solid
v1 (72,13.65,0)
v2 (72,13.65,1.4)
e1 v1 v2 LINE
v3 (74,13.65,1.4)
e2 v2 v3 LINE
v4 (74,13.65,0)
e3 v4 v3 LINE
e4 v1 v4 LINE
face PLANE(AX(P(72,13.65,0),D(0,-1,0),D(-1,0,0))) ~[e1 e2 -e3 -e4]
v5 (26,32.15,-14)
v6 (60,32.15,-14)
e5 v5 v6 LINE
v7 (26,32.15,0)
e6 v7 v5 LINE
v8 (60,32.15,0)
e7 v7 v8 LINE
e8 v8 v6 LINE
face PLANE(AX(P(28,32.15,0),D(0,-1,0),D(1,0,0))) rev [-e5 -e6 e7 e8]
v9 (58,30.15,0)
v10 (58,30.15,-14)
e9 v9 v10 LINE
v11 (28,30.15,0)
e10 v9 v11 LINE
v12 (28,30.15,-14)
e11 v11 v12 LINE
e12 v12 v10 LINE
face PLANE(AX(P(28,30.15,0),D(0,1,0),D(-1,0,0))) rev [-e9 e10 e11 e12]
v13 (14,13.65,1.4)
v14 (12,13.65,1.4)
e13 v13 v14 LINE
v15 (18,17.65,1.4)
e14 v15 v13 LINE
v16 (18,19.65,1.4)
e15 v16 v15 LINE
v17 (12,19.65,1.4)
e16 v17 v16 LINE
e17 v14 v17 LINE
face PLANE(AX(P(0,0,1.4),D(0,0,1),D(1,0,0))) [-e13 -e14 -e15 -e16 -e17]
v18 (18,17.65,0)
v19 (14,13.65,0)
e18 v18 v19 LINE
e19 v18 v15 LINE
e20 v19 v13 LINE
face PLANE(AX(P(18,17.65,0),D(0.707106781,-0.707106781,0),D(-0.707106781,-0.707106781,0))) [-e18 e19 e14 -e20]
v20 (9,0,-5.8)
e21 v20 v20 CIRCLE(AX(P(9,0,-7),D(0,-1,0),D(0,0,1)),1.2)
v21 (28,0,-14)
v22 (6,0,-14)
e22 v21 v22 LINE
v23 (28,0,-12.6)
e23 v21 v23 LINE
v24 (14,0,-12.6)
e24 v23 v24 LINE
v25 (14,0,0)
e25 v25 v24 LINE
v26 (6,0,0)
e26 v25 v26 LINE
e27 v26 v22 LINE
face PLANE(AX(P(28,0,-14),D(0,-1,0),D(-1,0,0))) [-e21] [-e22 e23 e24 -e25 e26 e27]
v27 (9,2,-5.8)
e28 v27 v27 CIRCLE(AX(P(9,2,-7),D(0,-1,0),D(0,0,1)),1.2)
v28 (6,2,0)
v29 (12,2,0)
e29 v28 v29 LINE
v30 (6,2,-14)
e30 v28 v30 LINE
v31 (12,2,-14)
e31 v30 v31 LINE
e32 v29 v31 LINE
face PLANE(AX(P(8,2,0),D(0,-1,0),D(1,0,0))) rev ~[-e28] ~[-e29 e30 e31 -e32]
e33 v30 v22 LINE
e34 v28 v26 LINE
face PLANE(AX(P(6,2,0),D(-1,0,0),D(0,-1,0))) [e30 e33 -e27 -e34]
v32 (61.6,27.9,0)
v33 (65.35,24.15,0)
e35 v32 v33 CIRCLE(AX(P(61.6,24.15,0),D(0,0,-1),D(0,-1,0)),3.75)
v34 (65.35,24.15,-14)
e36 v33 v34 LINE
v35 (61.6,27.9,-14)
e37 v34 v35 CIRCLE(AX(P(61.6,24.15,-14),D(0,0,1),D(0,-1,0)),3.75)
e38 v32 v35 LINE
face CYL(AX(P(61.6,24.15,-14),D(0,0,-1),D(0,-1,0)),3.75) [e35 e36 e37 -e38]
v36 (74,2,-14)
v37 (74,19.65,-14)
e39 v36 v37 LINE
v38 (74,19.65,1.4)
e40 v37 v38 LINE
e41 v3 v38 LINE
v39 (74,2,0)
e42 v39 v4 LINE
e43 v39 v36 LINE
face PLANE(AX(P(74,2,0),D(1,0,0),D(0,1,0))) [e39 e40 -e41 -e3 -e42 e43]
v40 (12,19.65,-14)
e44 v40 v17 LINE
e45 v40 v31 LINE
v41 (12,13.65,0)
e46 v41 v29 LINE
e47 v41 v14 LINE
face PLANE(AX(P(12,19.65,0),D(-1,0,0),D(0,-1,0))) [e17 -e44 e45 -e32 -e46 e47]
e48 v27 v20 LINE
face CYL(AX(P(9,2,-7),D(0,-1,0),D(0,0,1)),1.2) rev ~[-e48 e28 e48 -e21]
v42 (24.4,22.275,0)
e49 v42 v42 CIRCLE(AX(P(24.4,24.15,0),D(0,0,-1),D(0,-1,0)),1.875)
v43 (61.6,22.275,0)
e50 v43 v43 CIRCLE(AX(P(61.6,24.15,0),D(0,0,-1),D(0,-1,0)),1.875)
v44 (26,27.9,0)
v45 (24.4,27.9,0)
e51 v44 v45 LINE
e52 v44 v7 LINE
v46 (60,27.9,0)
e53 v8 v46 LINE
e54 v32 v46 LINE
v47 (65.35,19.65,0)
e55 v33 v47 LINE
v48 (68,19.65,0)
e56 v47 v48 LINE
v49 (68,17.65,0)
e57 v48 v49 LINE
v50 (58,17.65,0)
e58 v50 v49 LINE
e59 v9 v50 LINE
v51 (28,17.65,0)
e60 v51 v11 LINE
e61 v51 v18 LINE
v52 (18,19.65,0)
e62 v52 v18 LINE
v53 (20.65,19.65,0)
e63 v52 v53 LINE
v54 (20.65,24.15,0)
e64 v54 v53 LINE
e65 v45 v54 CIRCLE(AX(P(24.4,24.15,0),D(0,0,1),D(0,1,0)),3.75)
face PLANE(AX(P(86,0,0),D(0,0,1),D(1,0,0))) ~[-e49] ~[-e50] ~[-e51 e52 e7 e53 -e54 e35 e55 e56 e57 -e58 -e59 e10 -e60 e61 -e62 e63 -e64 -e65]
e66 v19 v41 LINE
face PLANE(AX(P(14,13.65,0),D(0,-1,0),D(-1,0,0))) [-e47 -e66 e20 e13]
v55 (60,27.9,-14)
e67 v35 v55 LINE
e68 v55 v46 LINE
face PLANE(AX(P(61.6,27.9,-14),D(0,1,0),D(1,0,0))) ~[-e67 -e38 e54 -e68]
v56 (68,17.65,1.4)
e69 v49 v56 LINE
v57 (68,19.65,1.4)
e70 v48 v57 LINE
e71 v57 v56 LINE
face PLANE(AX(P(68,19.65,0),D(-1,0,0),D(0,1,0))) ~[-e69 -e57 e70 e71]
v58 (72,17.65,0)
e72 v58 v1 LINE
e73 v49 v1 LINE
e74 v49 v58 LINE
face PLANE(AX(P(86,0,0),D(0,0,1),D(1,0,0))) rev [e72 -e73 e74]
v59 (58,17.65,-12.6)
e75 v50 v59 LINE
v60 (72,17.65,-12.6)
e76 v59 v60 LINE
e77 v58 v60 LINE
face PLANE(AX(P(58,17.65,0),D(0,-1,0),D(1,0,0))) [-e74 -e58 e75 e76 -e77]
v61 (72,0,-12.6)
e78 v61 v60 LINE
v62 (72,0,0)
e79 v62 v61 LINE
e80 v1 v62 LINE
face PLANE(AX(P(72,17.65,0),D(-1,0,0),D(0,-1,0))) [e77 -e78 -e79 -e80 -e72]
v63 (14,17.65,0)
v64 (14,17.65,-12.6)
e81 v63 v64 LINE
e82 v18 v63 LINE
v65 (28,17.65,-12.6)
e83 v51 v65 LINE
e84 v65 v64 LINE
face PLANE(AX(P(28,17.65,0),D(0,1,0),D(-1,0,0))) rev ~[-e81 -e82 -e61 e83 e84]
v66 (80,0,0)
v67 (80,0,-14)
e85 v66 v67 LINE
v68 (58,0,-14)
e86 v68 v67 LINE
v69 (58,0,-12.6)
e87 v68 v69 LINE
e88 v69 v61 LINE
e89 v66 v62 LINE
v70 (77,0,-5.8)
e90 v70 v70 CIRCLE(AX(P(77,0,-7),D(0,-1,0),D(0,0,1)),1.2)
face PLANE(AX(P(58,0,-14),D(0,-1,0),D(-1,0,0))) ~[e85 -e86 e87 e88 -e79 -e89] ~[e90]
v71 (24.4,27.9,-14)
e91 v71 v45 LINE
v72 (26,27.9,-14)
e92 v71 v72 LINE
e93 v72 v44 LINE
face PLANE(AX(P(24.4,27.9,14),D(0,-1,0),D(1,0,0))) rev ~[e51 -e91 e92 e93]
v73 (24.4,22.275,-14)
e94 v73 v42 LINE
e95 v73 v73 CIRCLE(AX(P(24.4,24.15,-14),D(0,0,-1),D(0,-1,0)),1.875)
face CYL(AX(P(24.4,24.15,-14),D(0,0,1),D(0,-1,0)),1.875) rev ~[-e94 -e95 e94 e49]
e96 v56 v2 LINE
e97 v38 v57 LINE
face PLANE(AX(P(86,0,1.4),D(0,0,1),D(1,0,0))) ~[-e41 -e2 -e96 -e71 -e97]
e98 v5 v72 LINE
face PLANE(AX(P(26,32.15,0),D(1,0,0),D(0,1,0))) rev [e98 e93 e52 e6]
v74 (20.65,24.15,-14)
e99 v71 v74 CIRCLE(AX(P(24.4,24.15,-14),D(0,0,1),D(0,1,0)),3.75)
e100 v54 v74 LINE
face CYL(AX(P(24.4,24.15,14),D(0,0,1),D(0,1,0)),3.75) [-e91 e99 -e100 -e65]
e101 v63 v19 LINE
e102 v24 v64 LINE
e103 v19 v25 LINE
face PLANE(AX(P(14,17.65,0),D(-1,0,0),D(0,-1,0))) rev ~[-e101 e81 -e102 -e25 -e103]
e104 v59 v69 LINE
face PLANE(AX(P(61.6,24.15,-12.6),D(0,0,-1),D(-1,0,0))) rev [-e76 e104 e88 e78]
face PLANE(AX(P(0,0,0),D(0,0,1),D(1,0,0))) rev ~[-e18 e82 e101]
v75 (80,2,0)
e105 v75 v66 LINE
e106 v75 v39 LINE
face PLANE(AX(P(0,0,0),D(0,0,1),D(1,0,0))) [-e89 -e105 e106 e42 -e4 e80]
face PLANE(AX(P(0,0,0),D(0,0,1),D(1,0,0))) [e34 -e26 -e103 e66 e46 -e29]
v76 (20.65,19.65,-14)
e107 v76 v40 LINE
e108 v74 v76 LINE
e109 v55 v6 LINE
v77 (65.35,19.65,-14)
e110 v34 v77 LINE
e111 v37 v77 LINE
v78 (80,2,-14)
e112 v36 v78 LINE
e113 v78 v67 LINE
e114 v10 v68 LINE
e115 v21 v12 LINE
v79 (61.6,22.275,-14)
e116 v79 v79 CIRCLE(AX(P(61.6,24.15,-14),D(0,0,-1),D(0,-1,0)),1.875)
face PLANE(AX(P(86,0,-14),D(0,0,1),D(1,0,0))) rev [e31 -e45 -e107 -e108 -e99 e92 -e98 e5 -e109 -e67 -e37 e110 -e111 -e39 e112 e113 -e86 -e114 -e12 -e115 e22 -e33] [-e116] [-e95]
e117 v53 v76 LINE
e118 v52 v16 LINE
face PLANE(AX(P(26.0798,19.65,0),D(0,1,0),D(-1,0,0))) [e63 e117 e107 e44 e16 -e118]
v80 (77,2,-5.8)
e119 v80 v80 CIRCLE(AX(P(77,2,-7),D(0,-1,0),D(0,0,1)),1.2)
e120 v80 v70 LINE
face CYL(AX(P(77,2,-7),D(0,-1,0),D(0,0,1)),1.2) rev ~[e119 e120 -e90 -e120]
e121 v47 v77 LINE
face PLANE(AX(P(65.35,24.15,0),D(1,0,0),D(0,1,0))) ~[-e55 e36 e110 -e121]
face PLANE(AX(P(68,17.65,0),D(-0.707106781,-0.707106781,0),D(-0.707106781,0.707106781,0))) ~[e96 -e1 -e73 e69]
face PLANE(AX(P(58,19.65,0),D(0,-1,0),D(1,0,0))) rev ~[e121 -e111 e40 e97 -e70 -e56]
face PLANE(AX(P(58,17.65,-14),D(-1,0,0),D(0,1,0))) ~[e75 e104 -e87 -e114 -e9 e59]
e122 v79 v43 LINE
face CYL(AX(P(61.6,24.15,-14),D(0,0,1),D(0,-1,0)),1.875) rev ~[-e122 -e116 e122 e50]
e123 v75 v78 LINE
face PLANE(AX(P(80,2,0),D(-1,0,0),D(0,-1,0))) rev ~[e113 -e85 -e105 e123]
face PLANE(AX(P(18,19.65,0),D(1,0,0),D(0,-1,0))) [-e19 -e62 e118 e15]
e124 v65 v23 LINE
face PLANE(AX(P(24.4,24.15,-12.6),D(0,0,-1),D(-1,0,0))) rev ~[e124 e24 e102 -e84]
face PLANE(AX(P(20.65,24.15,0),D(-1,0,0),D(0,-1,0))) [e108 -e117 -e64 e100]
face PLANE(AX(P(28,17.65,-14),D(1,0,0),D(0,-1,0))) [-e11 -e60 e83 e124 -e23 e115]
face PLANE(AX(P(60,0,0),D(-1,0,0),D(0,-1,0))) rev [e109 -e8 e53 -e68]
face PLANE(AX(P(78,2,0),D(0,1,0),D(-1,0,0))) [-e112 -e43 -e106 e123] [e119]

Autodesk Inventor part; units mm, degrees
ref_plane "YZ Plane" through (0, 0, 0) normal (1, 0, 0) x (0, 1, 0)
ref_plane "XZ Plane" through (0, 0, 0) normal (0, 1, 0) x (-1, 0, 0)
ref_plane "XY Plane" through (0, 0, 0) normal (0, 0, 1) x (1, 0, 0)
sketch "スケッチ1" plane through (0, 0, 0) normal (0, 0, 1) x (1, 0, 0)
  line L0 (0, 0) -> (0, 17.65)
  line L1 (0, 17.65) -> (28, 17.65)
  line L2 (28, 17.65) -> (28, 30.15)
  line L3 (28, 30.15) -> (58, 30.15)
  line L4 (58, 30.15) -> (58, 0)
  line L5 (58, 0) -> (60, 0)
  line L6 (60, 0) -> (60, 32.15)
  line L7 (60, 32.15) -> (28, 32.15)
  line L8 (28, 32.15) -> (26, 32.15)
  line L9 (26, 32.15) -> (26, 19.65)
  line L10 (26, 19.65) -> (-2, 19.65)
  line L11 (-2, 19.65) -> (-2, 0)
  line L12 (-2, 0) -> (0, 0)
  dimension "d0" = 17.65
  dimension "d1" = 28
  dimension "d2" = 12.5
  dimension "d3" = 30
  dimension "d4" = 2
  dimension "d5" = 32.15
  dimension "d6" = 32
  dimension "d7" = 2
  dimension "d8" = 12.5
  dimension "d9" = 28
extrude "押し出し1" add sketch "スケッチ1" along normal blind 14
sketch "スケッチ2" plane through (60, 0, 0) normal (1, 0, 0) x (0, 0, -1)
  line L0 (0, 0) -> (-14, 0) projected
  line L1 (-14, 0) -> (0, 0)
  line L2 (0, 0) -> (0, 2)
  line L3 (0, 2) -> (-14, 2)
  line L4 (-14, 2) -> (-14, 0)
  dimension "d12" = 14
  dimension "d13" = 2
extrude "押し出し2" add sketch "スケッチ2" along normal blind 7
sketch "スケッチ3" plane through (-2, 0, 0) normal (-1, 0, 0) x (0, 0, 1)
  line L0 (14, 2) -> (0, 2) projected
  line L1 (0, 0) -> (14, 0)
  line L2 (14, 0) -> (14, 2)
  line L3 (14, 2) -> (0, 2)
  line L4 (0, 2) -> (0, 0)
  dimension "d16" = 14
extrude "押し出し3" add sketch "スケッチ3" along normal blind 7
sketch "スケッチ4" plane through (0, 0, 14) normal (0, 0, 1) x (1, 0, 0)
  line L0 (60, 32.15) -> (60, 24.15)
  line L1 (60, 24.15) -> (61.6, 24.15)
  arc A0 (61.6, 20.4) -> (61.6, 27.9) centre (61.6, 24.15) ccw
  line L2 (61.6, 24.15) -> (61.6, 20.4) construction
  line L3 (61.6, 24.15) -> (61.6, 27.9) construction
  line L4 (61.6, 27.9) -> (60, 27.9)
  line L5 (61.6, 20.4) -> (60, 20.4)
  line L6 (60, 2) -> (60, 32.15) projected
  line L7 (60, 27.9) -> (60, 20.4)
  point P0 (0, 0)
  dimension "d47" = 8
  dimension "d48" = 1.6
  dimension "d49" = 3.75
  dimension "d50" = 180
extrude "押し出し4" add sketch "スケッチ4" against normal blind 14
hole "穴3" at (61.6, 24.15, 14) direction (0, 0, -1) diameter 3.75 end through all
sketch "スケッチ7" plane through (0, 0, 14) normal (0, 0, 1) x (1, 0, 0)
  line L0 (60, 32.15) -> (26, 32.15) projected
  line L1 (26, 32.15) -> (26, 24.15)
  line L2 (26, 24.15) -> (24.4, 24.15)
  arc A0 (24.4, 27.9) -> (24.4, 20.4) centre (24.4, 24.15) ccw
  line L3 (24.4, 27.9) -> (26, 27.9)
  line L4 (24.4, 20.4) -> (26, 20.4)
  line L5 (26, 20.4) -> (26, 27.9)
  line L6 (26, 32.15) -> (26, 19.65) projected
  circle A1 centre (24.4, 24.15) radius 1.875
  point P0 (0, 0)
  dimension "d60" = 8
  dimension "d61" = 1.6
  dimension "d62" = 3.75
  dimension "d63" = 3.75
extrude "押し出し6" add sketch "スケッチ7" against normal blind 14 contours L1 A1 L5 L4 A0 L3 | L1 L5 A1 picked at (23.6929, 24.15)
hole "穴4" at (24.4, 24.15, 14) direction (0, 0, -1) diameter 3.75 end through all
sketch "スケッチ10" plane through (0, 17.65, 0) normal (0, -1, 0) x (1, 0, 0)
  line L0 (28, 14) -> (58, 14) projected
  line L1 (0, 0) -> (28, 0)
  line L2 (28, 0) -> (28, 14)
  line L3 (28, 14) -> (0, 14)
  line L4 (0, 14) -> (0, 0)
extrude "押し出し7" cut sketch "スケッチ10" against normal blind 0.6
sketch "スケッチ11" plane through (0, 0, 0) normal (0, -1, 0) x (1, 0, 0)
  line L0 (0, 14) -> (-9, 14) projected
  line L1 (60, 0) -> (67, 0) projected
  line L2 (-9, 14) -> (67, 14)
  line L3 (67, 14) -> (67, 0)
  line L4 (67, 0) -> (-9, 0)
  line L5 (-9, 0) -> (-9, 14)
  point P0 (0, 0)
extrude "押し出し8" cut sketch "スケッチ11" against normal blind 0.6
sketch "スケッチ12" plane through (0, 0, 14) normal (0, 0, 1) x (1, 0, 0)
  line L0 (-2, 19.65) -> (-2, 2) projected
  line L1 (-2, 19.65) -> (4, 19.65)
  line L2 (26, 19.65) -> (-2, 19.65) projected
  line L3 (4, 19.65) -> (4, 18.25)
  line L4 (0, 18.25) -> (28, 18.25) projected
  line L5 (4, 18.25) -> (0.2844, 14.5344)
  line L6 (4, 18.25) -> (9.2547, 18.25) construction
  line L7 (0.2844, 14.5344) -> (0, 14.25)
  line L8 (0, 0.6) -> (0, 18.25) projected
  line L9 (0, 14.25) -> (-2, 14.25)
  line L10 (-2, 14.25) -> (-2, 19.65)
  point P0 (0, 0)
  dimension "d79" = 6
  dimension "d80" = 135
extrude "押し出し9" add sketch "スケッチ12" along normal blind 2
sketch "スケッチ15" plane through (0, 0, 0) normal (0, 0, -1) x (-1, 0, 0)
  line L0 (0, 0.6) -> (0, 18.25) projected
  line L1 (0, 18.25) -> (-14, 18.25)
  line L2 (-14, 18.25) -> (-14, 0.6)
  line L3 (-14, 0.6) -> (0, 0.6)
  line L4 (0, 0.6) -> (0, 18.25)
  point P0 (0, 0)
  dimension "d88" = 14
extrude "押し出し11" add sketch "スケッチ15" against normal blind 1.4
sketch "スケッチ17" plane through (67, 0, 0) normal (1, 0, 0) x (0, 0, -1)
  line L0 (0, 0.6) -> (-14, 0.6) projected
  line L1 (0, 0.6) -> (-14, 0.6)
  line L2 (-14, 0.6) -> (-14, 9.5309)
  line L3 (-14, 9.5309) -> (0, 9.5309)
  line L4 (0, 9.5309) -> (0, 0.6)
  point P0 (0, 0)
extrude "押し出し13" cut sketch "スケッチ17" against normal blind 3
sketch "スケッチ18" plane through (-9, 0, 0) normal (-1, 0, 0) x (0, 0, 1)
  line L0 (0, 0.6) -> (14, 0.6) projected
  line L1 (0, 0.6) -> (14, 0.6)
  line L2 (14, 0.6) -> (14, 6.5)
  line L3 (14, 6.5) -> (0, 6.5)
  line L4 (0, 6.5) -> (0, 0.6)
  point P0 (0, 0)
extrude "押し出し14" cut sketch "スケッチ18" against normal blind 3
hole "穴5" at (-4, 2, 7) direction (0, -1, 0) diameter 2.4 end through all
hole "穴6" at (62, 2, 7) direction (0, -1, 0) diameter 2.4 end through all
mirror "ミラー1" about plane through (31.8158, 20.0509, 0) normal (0, 0, -1) of "押し出し3", "押し出し1", "押し出し4", "穴3", "押し出し2", "穴6", "穴4", "押し出し6", "押し出し7", "押し出し9", "押し出し11", "押し出し14", "押し出し13", "穴5", "押し出し8"
sketch "スケッチ19" plane through (0, 0, 14) normal (0, 0, 1) x (1, 0, 0)
  line L0 (94.8832, 81.412) -> (-62.365, 81.412)
  line L1 (-62.365, 81.412) -> (-62.365, -71.7744)
  line L2 (-62.365, -71.7744) -> (94.8832, -71.7744)
  line L3 (94.8832, -71.7744) -> (94.8832, 81.412)
  point P0 (0, 0)
extrude "押し出し15" cut sketch "スケッチ19" against normal blind 14
sketch "スケッチ20" plane through (-2, 19.65, 14) normal (0, 1, 0) x (1, 0, 0)
  line L0 (17.6833, -4.2941) -> (-12.6138, -4.2941)
  line L1 (-12.6138, -4.2941) -> (-12.6138, 1.0873)
  line L2 (-12.6138, 1.0873) -> (17.6833, 1.0873)
  line L3 (17.6833, 1.0873) -> (17.6833, -4.2941)
  point P0 (2, 14)
extrude "押し出し16" cut sketch "スケッチ20" against normal blind 14
sketch "スケッチ21" plane through (26, 27.9, -14) normal (-1, 0, 0) x (0, 0, 1)
  line L0 (0, -8.25) -> (-2, -8.25) projected
  line L1 (-2, -8.25) -> (18.9234, -8.25)
  line L2 (18.9234, -8.25) -> (18.9234, 5.2405)
  line L3 (18.9234, 5.2405) -> (-2, 5.2405)
  line L4 (-2, 5.2405) -> (-2, -8.25)
  point P0 (14, -27.9)
split body "分割1" sketch "スケッチ21" result one side removed curves L2 L3 L4 L1 removed pieces at (9.3333, 19.15, -4.6667) (58.5, 13.3, -4.6667)
sketch "スケッチ22" plane through (0, 0, 0) normal (0, 0, 1) x (1, 0, 0)
  line L0 (28, 19.65) -> (28, 30.15) projected
  line L1 (28, 19.65) -> (28, 17.65)
  line L2 (28, 17.65) -> (14, 17.65)
  line L3 (14, 17.65) -> (14, 0)
  line L4 (14, 17.65) -> (31.65, 17.65) construction
  line L5 (14, 0) -> (8, 0)
  line L6 (8, 0) -> (8, 2)
  line L7 (8, 2) -> (12, 2)
  line L8 (26.0798, 19.65) -> (12, 19.65)
  line L9 (12, 19.65) -> (12, 2)
  line L10 (58, 19.65) -> (60, 19.65) projected
  line L11 (58, 19.65) -> (58, 17.65)
  line L12 (58, 17.65) -> (72, 17.65)
  line L13 (72, 17.65) -> (72, 0)
  line L14 (72, 0) -> (78, 0)
  line L15 (78, 0) -> (78, 2)
  line L16 (78, 2) -> (74, 2)
  line L17 (74, 2) -> (74, 19.65)
  line L18 (74, 19.65) -> (60, 19.65)
  line L19 (26.0798, 19.65) -> (28, 19.65)
  line L20 (24.4, 20.4) -> (26, 20.4) projected
  line L21 (58, 19.65) -> (60, 19.65)
  point P0 (0, 0)
  dimension "d119" = 2
  dimension "d120" = 14
  dimension "d121" = 17.65
  dimension "d122" = 90
  dimension "d123" = 6
  dimension "d124" = 2
  dimension "d125" = 4
  dimension "d126" = 14
  dimension "d127" = 6
  dimension "d128" = 2
  dimension "d129" = 4
extrude "押し出し17" add sketch "スケッチ22" against normal blind 14
sketch "スケッチ23" plane through (26, 32.15, -14) normal (0, 1, 0) x (1, 0, 0)
  line L0 (32, -14) -> (2, -14) projected
  line L1 (17, -14) -> (17, 0)
  line L2 (2, 0) -> (32, 0) projected
  point P0 (-26, -14)
sketch "スケッチ25" plane through (24.4, 24.15, -14) normal (0, 0, -1) x (-1, 0, 0)
  line L0 (-3.6, -6.5) -> (10.4, -6.5) projected
  line L1 (10.4, -6.5) -> (-3.6, -6.5)
  line L2 (-3.6, -6.5) -> (-3.6, -24.15)
  line L3 (-3.6, -24.15) -> (10.4, -24.15)
  line L4 (10.4, -24.15) -> (10.4, -6.5)
  point P0 (24.4, -24.15)
extrude "押し出し18" add sketch "スケッチ25" against normal blind 1.4
ref_plane "作業平面1" through (43, 32.15, 0) normal (1, 0, 0) x (0, 0, -1)
mirror "ミラー3" about plane through (43, 32.15, 0) normal (1, 0, 0) of "押し出し18"
sketch "スケッチ26" plane through (0, 0, 0) normal (0, 0, 1) x (1, 0, 0)
  line L0 (12, 2) -> (12, 19.65) projected
  line L1 (12, 19.65) -> (18, 19.65)
  line L2 (12, 19.65) -> (26, 19.65) projected
  line L3 (18, 19.65) -> (18, 17.65)
  line L4 (28, 17.65) -> (14, 17.65) projected
  line L5 (18, 17.65) -> (14, 13.65)
  line L6 (14, 17.65) -> (14, 0) projected
  line L7 (18, 17.65) -> (23.6569, 17.65) construction
  line L8 (14, 13.65) -> (12, 13.65)
  line L9 (12, 13.65) -> (12, 19.65)
  point P0 (0, 0)
  dimension "d139" = 6
  dimension "d140" = 135
extrude "押し出し20" add sketch "スケッチ26" along normal blind 1.4
mirror "ミラー4" about plane through (43, 32.15, 0) normal (1, 0, 0) of "押し出し20"
sketch "スケッチ27" plane through (0, 0, 0) normal (0, 0, 1) x (1, 0, 0)
  line L0 (8, 2) -> (12, 2) projected
  line L1 (8, 2) -> (6, 2)
  line L2 (6, 2) -> (6, 0)
  line L3 (6, 0) -> (8, 0)
  line L4 (8, 0) -> (8, 2)
  line L5 (78, 2) -> (80, 2)
  line L6 (80, 2) -> (80, 0)
  line L7 (80, 0) -> (78, 0)
  line L8 (78, 0) -> (78, 2)
  point P0 (0, 0)
  dimension "d143" = 2
  dimension "d144" = 2
extrude "押し出し21" add sketch "スケッチ27" against normal blind 14
hole "穴7" at (77, 2, -7) direction (0, -1, 0) diameter 2.4 end through all
hole "穴8" at (9, 2, -7) direction (0, -1, 0) diameter 2.4 end through all
sketch "スケッチ28" plane through (0, 0, 0) normal (0, 0, 1) x (1, 0, 0)
  arc A0 (24.4, 27.9) -> (24.4, 20.4) centre (24.4, 24.15) ccw projected
  line L0 (20.65, 24.15) -> (20.65, 19.65)
  line L1 (12, 19.65) -> (26, 19.65) projected
  line L2 (24.4, 20.4) -> (26, 20.4) projected
  line L3 (26, 19.65) -> (26, 20.4)
  line L4 (26, 20.4) -> (20.65, 24.15)
  point P0 (0, 0)
extrude "押し出し22" add sketch "スケッチ28" against normal blind 14 contours A0 L2 L3 L1 L0
mirror "ミラー5" about plane through (43, 32.15, 0) normal (1, 0, 0) of "押し出し22"
properties part number "センサ冶具1セット"
